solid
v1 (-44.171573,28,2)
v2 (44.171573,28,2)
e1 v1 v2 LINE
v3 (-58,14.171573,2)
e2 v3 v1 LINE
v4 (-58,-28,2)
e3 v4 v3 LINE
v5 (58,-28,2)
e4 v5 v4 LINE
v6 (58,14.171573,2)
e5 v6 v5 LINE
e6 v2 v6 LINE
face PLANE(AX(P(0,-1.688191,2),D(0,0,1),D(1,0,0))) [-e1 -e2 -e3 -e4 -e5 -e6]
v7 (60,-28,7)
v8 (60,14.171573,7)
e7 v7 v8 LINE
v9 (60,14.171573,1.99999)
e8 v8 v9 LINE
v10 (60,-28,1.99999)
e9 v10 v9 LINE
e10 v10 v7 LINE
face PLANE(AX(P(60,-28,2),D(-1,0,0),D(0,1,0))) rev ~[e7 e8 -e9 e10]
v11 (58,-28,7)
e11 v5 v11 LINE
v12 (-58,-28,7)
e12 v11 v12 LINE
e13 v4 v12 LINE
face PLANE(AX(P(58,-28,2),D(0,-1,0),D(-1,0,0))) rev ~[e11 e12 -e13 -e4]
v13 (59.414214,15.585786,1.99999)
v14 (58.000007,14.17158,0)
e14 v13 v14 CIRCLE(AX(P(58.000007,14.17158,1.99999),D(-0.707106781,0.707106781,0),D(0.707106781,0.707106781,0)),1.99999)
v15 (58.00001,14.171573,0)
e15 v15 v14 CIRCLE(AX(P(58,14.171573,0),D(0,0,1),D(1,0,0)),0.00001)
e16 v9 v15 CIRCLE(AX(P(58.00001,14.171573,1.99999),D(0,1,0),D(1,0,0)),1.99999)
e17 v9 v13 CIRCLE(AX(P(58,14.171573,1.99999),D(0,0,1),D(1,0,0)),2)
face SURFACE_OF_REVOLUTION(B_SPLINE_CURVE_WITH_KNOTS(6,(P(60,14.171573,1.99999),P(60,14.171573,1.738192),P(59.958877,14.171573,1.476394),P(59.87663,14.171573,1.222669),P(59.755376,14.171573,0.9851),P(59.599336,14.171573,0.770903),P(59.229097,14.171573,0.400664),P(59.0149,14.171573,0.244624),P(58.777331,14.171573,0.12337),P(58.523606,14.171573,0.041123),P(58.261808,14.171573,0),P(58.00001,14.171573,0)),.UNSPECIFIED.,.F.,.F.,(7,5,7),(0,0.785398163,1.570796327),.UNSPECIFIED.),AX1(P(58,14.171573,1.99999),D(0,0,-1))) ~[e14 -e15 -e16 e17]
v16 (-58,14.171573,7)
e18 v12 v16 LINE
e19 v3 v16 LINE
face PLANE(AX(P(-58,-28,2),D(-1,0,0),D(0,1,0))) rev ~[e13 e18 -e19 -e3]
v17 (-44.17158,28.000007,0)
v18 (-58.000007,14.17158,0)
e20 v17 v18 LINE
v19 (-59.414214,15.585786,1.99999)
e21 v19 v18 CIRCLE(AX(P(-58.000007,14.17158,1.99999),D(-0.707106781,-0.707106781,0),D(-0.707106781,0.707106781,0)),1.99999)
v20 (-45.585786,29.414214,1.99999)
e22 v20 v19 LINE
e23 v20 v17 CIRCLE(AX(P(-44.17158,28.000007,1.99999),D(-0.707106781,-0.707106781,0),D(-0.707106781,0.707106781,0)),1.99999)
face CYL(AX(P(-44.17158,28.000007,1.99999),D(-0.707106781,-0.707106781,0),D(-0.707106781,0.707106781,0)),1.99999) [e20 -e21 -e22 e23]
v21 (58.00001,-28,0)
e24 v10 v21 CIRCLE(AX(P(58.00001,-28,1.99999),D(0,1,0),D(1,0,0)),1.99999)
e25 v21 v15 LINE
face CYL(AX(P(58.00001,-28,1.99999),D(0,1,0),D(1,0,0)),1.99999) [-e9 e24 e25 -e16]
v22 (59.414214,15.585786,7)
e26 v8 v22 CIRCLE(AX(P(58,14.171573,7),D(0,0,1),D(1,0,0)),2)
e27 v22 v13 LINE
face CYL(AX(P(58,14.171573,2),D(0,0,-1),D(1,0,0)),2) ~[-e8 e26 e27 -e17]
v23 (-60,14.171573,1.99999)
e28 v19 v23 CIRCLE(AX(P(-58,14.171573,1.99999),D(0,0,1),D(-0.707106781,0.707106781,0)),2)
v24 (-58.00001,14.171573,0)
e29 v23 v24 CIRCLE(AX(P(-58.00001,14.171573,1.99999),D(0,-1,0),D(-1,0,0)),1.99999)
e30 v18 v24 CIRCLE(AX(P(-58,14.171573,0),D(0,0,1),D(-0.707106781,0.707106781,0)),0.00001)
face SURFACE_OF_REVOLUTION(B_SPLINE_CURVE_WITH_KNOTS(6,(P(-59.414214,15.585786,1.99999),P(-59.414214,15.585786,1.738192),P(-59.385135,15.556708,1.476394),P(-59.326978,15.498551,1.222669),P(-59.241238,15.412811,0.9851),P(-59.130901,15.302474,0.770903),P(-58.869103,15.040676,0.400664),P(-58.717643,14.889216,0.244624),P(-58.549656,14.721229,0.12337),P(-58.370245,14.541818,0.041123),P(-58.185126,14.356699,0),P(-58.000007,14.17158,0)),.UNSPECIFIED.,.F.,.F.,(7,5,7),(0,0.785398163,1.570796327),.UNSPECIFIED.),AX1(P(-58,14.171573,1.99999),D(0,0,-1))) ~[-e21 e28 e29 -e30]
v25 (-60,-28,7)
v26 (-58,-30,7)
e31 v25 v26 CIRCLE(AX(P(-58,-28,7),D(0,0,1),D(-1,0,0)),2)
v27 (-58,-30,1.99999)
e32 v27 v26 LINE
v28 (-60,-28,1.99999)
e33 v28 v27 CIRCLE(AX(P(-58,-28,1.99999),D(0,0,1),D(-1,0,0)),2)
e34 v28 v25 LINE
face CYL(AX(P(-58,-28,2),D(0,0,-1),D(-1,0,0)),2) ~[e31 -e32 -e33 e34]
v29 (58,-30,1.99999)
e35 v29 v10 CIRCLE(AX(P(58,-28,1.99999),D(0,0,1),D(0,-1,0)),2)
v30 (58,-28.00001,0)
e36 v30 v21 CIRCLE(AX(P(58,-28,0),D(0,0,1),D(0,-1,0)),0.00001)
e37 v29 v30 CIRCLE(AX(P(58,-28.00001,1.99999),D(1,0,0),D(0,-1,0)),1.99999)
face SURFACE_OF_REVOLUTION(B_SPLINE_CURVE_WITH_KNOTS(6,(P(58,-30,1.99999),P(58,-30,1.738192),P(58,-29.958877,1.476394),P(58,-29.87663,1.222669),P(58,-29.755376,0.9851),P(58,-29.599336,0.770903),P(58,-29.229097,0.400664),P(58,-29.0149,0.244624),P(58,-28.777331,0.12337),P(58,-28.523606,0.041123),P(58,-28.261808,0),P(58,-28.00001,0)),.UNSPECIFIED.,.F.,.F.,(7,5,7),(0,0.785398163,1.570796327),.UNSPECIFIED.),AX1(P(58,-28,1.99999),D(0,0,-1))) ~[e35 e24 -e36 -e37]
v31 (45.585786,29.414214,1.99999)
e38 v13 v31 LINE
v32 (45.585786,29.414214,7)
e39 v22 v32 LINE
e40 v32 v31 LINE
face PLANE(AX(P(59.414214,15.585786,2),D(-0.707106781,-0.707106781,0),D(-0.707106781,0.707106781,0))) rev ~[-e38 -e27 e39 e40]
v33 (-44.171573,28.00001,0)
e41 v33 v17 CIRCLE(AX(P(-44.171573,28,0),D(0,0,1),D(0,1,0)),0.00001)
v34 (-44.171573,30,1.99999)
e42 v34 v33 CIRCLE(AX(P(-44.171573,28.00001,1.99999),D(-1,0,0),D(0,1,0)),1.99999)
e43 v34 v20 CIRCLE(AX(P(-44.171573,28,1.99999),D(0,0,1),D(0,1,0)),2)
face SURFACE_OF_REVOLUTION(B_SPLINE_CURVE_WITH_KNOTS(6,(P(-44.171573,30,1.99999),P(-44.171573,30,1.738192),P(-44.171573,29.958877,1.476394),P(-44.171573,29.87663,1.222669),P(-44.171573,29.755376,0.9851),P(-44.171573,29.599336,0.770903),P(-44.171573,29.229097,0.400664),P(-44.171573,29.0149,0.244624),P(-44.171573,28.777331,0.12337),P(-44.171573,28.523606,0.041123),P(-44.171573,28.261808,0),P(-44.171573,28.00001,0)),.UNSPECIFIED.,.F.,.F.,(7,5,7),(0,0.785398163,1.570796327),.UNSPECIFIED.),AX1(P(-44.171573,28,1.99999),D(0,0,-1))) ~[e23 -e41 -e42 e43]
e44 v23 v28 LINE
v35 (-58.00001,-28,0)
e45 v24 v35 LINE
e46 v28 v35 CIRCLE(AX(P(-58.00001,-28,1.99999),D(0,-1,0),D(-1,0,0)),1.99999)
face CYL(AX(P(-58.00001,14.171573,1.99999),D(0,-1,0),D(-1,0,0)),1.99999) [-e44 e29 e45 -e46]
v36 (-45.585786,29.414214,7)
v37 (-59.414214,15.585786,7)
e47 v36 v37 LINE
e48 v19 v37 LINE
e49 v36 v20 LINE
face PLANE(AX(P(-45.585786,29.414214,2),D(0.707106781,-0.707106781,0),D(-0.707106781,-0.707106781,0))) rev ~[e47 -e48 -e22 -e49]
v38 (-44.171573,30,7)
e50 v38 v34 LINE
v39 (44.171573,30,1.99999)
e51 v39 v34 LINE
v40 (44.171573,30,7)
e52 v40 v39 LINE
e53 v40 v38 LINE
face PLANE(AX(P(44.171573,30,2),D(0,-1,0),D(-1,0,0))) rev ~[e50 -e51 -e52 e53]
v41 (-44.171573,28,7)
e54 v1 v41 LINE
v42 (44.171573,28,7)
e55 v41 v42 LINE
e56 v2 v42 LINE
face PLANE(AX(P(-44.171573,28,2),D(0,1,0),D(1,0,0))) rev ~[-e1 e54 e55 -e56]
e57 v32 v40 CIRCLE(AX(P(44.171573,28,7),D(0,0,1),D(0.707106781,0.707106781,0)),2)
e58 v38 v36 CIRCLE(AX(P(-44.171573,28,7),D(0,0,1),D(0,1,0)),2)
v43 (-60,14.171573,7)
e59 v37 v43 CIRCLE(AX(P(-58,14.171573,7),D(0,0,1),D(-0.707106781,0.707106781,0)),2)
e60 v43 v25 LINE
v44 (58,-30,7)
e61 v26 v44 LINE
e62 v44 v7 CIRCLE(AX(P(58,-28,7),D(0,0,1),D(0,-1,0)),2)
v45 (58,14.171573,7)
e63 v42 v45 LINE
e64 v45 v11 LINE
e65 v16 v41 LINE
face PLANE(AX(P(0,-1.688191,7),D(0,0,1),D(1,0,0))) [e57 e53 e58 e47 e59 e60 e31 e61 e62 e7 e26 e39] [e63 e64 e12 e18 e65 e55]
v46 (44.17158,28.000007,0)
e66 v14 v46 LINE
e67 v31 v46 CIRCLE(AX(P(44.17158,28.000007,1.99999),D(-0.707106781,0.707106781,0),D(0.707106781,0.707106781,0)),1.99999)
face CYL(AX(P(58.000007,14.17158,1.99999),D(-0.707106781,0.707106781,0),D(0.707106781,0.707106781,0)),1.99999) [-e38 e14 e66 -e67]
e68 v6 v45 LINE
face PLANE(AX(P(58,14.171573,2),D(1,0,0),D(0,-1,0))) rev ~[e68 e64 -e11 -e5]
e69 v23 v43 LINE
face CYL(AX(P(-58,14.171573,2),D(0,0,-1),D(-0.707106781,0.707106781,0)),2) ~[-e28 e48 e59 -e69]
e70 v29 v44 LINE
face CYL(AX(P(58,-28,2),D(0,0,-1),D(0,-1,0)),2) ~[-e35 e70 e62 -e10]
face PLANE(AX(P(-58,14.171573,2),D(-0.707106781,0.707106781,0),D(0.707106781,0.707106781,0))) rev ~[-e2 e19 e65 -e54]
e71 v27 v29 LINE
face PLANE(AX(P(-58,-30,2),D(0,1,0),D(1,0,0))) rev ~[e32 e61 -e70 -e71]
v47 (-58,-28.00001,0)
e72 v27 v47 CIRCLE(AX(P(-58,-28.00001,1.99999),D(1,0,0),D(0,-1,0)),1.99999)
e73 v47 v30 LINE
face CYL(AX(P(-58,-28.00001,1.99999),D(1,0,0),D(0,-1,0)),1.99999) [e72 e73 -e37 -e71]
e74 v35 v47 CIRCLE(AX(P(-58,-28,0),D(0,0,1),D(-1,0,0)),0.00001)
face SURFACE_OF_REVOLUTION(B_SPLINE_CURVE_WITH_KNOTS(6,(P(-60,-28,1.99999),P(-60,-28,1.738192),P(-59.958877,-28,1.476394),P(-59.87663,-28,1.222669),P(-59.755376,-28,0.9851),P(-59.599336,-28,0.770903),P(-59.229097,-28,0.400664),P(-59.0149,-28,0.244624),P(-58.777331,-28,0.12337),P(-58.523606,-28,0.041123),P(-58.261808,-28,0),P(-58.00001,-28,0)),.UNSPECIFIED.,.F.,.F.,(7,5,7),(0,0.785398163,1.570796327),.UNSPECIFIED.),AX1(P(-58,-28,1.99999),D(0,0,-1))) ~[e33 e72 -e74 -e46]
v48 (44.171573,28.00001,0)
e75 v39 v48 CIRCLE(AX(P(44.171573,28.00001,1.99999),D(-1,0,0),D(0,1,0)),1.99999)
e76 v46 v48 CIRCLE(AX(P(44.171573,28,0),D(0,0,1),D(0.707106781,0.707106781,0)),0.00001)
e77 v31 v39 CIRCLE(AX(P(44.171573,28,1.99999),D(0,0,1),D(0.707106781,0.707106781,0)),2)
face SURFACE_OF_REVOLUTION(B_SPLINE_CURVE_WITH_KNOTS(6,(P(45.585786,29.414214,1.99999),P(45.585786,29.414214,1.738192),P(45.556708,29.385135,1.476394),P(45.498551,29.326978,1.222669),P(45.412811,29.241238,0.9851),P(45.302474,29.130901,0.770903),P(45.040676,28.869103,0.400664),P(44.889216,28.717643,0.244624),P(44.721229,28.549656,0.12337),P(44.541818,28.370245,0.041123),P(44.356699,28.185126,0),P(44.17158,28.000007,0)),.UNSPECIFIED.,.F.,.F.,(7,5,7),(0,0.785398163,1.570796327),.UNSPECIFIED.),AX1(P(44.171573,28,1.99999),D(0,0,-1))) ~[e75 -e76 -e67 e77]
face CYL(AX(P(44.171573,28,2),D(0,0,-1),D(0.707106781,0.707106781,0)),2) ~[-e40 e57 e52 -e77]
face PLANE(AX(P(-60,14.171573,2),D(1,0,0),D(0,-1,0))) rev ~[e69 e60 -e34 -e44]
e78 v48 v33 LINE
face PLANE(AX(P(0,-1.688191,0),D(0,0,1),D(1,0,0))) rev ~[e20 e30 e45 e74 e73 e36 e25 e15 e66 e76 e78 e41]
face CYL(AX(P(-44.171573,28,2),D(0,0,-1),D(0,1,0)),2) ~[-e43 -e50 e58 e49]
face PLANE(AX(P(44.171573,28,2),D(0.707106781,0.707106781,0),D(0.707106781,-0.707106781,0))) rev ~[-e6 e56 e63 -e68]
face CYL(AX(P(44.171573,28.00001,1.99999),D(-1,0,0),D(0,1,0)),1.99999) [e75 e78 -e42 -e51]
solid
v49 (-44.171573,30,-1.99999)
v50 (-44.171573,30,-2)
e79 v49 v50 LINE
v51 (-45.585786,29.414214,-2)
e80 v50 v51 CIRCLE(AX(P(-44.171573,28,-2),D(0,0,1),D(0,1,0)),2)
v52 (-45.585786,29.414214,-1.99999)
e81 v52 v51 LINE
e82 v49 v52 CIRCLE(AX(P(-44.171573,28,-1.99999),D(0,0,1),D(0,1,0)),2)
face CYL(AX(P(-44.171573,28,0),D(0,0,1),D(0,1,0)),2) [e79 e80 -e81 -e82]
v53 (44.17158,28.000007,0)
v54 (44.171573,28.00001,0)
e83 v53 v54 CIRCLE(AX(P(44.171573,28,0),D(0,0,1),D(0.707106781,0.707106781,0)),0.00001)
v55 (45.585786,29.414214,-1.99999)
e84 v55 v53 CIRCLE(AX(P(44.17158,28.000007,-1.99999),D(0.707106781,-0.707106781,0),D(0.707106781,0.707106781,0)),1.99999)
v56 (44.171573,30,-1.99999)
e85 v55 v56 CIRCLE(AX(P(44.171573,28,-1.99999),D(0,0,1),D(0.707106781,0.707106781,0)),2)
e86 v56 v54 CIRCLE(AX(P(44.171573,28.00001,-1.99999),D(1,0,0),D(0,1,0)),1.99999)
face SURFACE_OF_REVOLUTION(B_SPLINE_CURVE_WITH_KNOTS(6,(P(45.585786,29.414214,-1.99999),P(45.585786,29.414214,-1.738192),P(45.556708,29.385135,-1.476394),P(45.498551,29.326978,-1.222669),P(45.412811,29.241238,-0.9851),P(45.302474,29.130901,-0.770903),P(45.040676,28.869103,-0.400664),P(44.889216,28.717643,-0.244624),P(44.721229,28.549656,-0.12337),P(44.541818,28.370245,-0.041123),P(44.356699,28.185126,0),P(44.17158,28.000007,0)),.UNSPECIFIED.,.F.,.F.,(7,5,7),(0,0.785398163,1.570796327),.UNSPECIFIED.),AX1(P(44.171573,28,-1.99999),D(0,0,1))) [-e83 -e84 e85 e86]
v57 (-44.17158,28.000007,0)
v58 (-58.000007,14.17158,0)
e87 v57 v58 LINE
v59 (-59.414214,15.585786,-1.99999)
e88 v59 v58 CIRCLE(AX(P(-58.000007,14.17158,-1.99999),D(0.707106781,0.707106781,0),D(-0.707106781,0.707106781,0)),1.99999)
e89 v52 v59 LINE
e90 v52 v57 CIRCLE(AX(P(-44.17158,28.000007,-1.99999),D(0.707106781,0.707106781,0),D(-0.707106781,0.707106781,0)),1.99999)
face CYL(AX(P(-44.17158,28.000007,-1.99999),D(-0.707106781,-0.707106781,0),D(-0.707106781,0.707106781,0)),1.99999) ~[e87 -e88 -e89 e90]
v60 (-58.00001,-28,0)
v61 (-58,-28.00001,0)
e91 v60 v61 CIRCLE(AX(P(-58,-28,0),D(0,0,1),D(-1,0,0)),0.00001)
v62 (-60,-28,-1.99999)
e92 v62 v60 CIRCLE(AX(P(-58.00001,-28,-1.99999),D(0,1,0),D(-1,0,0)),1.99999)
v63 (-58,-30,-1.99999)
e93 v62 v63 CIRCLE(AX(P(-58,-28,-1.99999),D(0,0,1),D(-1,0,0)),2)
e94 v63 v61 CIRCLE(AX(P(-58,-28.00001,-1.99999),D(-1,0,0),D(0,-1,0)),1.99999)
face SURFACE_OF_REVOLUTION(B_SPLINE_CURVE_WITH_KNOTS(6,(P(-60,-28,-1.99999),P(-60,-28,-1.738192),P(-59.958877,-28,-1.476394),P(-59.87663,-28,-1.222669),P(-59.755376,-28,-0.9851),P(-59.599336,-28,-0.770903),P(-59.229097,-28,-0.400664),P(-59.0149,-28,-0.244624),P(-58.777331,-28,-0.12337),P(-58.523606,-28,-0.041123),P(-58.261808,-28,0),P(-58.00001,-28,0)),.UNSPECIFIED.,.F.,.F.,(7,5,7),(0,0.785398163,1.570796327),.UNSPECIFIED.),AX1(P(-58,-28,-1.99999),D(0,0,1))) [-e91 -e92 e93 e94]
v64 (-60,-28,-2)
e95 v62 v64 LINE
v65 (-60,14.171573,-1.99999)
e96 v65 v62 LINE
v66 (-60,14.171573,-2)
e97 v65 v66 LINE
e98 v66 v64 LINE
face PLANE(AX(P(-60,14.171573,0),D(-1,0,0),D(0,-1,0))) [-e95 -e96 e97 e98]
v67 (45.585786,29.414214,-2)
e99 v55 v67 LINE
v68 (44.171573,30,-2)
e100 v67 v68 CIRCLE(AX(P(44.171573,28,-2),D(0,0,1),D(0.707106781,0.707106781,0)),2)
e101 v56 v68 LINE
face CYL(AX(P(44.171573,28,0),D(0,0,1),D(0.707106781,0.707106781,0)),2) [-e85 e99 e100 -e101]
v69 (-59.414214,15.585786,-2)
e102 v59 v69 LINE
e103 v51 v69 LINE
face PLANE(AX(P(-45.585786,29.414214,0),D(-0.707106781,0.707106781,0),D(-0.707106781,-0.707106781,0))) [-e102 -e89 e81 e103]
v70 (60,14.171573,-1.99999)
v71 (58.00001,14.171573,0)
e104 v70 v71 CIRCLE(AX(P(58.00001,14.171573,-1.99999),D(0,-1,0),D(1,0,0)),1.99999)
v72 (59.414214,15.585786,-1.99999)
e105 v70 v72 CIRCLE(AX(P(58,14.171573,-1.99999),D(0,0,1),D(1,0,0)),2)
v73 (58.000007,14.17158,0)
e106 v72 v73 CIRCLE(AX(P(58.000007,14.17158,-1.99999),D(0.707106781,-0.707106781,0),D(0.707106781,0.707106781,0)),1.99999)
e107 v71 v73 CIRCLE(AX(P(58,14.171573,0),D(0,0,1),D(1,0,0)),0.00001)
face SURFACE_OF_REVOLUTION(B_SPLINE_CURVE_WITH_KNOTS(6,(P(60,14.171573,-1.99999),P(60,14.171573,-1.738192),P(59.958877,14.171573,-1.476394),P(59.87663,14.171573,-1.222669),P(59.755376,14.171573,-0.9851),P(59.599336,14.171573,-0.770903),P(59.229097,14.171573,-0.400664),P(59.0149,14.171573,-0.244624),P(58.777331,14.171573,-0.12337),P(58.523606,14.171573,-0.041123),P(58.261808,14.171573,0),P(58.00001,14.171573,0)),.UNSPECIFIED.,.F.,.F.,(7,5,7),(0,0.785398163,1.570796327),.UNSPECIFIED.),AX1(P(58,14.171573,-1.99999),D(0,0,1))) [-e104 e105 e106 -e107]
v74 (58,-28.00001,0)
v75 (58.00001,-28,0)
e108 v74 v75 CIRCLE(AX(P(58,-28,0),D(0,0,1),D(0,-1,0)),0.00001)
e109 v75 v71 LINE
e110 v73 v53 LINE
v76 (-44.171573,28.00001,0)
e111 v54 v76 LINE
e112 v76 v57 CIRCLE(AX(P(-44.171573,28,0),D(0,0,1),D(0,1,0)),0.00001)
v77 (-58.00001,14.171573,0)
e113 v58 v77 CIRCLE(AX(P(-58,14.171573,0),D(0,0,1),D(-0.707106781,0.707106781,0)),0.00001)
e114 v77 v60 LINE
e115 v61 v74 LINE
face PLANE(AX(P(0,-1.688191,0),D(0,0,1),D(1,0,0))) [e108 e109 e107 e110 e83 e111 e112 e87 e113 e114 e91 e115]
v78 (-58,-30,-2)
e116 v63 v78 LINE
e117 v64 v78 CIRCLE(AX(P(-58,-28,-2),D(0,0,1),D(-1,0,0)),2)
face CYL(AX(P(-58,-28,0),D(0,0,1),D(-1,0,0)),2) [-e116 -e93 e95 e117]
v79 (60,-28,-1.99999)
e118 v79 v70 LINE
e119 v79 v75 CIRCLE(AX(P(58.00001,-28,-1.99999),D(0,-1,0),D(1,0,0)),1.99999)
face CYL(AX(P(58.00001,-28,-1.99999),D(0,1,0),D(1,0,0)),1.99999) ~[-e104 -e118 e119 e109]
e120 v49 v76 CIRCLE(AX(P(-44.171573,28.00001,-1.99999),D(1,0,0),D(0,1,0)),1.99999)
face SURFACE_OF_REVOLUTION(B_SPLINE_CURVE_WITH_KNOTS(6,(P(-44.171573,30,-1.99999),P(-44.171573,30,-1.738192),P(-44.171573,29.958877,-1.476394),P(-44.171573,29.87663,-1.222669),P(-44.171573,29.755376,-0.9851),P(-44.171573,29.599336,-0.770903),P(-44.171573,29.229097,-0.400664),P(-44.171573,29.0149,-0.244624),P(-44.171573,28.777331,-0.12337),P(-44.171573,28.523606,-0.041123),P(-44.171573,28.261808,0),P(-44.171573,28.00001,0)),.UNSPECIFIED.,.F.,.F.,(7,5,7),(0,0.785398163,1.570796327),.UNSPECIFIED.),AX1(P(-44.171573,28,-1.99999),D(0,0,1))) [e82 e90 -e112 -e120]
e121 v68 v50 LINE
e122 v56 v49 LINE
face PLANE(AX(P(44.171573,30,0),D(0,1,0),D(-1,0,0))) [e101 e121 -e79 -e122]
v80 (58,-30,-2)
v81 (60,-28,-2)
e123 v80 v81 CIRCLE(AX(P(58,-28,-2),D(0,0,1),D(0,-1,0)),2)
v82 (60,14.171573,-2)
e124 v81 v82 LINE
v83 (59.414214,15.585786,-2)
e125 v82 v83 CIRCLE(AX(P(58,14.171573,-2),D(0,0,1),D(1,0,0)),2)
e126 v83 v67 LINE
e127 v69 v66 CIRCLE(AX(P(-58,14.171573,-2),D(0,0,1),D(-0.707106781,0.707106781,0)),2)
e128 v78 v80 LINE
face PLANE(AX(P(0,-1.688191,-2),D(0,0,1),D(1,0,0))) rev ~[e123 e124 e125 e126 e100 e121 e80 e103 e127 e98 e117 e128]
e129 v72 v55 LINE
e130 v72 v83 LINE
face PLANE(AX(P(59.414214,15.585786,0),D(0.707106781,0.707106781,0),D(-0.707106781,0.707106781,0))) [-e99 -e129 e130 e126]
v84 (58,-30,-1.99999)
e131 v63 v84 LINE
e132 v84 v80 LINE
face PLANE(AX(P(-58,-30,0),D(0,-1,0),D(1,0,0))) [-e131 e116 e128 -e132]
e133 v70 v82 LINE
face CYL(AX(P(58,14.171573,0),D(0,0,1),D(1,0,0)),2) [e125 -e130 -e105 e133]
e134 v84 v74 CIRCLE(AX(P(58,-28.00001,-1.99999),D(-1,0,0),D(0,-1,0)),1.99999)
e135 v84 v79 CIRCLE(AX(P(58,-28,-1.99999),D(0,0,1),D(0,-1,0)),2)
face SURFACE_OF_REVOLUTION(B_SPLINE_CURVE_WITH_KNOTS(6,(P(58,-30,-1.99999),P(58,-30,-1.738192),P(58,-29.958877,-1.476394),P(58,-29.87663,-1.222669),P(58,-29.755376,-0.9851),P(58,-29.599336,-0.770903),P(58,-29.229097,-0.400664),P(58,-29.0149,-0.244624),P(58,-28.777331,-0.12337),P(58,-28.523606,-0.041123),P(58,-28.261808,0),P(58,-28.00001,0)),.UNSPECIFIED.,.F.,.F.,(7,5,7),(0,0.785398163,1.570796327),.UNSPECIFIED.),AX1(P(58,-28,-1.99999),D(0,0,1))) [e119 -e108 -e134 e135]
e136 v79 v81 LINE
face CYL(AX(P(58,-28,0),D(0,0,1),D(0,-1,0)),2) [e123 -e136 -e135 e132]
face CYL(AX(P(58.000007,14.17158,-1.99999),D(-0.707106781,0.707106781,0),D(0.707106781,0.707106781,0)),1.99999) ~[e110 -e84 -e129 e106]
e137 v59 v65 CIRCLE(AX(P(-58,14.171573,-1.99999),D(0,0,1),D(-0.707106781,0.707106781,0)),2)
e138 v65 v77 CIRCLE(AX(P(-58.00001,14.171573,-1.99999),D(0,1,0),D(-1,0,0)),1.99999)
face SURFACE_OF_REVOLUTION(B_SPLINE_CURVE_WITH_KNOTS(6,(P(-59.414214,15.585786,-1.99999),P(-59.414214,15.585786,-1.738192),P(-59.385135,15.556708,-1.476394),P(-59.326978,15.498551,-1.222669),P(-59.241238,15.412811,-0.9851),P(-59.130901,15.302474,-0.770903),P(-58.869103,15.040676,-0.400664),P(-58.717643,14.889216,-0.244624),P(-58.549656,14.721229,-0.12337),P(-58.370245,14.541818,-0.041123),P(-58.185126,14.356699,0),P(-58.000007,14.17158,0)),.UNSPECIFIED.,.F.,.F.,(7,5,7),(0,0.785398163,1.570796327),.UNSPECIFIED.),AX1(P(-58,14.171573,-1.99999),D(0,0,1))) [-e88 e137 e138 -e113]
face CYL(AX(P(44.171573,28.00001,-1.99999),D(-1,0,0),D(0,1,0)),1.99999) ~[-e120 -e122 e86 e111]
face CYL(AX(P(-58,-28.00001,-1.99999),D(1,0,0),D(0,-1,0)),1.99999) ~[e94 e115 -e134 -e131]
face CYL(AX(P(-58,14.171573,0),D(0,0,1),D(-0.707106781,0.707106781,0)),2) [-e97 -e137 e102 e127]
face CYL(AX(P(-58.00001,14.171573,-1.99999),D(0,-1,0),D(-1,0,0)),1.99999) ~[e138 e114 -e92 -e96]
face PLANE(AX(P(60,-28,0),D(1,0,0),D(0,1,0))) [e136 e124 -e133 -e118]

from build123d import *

# Parameters (mm, degrees)
F1_DEPTH = 2
F2_R     = 1.99999
F4_DEPTH = 5
F5_DEPTH = 2
F6_R     = 1.99999


# Not quite as in the source:
# - a fillet or chamfer is up to 0.001 mm smaller than in the source, because OpenCascade refuses the exact size


with BuildPart() as f1:
    # F0 (on Top) → F1 (new body)
    with BuildSketch(Plane.XY):
        with BuildLine():
            ThreePointArc((-60, -28), (-59.4142135624, -29.4142135624), (-58, -30))
            Line((-58, -30), (58, -30))
            ThreePointArc((58, -30), (59.4142135624, -29.4142135624), (60, -28))
            Line((60, -28), (60, 14.1715728753))
            ThreePointArc((60, 14.1715728753), (59.847759065, 14.93693974), (59.4142135624, 15.5857864376))
            Line((59.4142135624, 15.5857864376), (45.5857864376, 29.4142135624))
            ThreePointArc((45.5857864376, 29.4142135624), (44.93693974, 29.847759065), (44.1715728753, 30))
            Line((44.1715728753, 30), (-44.1715728753, 30))
            ThreePointArc((-44.1715728753, 30), (-44.93693974, 29.847759065), (-45.5857864376, 29.4142135624))
            Line((-45.5857864376, 29.4142135624), (-59.4142135624, 15.5857864376))
            ThreePointArc((-59.4142135624, 15.5857864376), (-59.847759065, 14.93693974), (-60, 14.1715728753))
            Line((-60, 14.1715728753), (-60, -28))
        make_face()
    extrude(amount=F1_DEPTH)

    # F2 (radius 2 in the source; OpenCascade refuses exactly that, so slightly less here)
    f2_edges = [f1.edges().sort_by_distance(p)[0] for p in [
        (0, -30, 0),
        (-60, -6.914214, 0),
        (0, 30, 0),
        (52.5, 22.5, 0),
        (60, -6.914214, 0),
        (-52.5, 22.5, 0),
    ]]
    fillet(f2_edges, radius=F2_R)

    # F3 (on face) → F4 (join)
    with BuildSketch(Plane.XY.offset(2)):
        with BuildLine():
            Line((-45.5857864376, 29.4142135624), (-59.4142135624, 15.5857864376))
            ThreePointArc((-59.4142135624, 15.5857864376), (-59.847759065, 14.93693974), (-60, 14.1715728753))
            Line((-60, 14.1715728753), (-60, -28))
            ThreePointArc((-60, -28), (-59.4142135624, -29.4142135624), (-58, -30))
            Line((-58, -30), (58, -30))
            ThreePointArc((58, -30), (59.4142135624, -29.4142135624), (60, -28))
            Line((60, -28), (60, 14.1715728753))
            ThreePointArc((60, 14.1715728753), (59.847759065, 14.93693974), (59.4142135624, 15.5857864376))
            Line((59.4142135624, 15.5857864376), (45.5857864376, 29.4142135624))
            ThreePointArc((45.5857864376, 29.4142135624), (44.93693974, 29.847759065), (44.1715728753, 30))
            Line((44.1715728753, 30), (-44.1715728753, 30))
            ThreePointArc((-44.1715728753, 30), (-44.93693974, 29.847759065), (-45.5857864376, 29.4142135624))
        make_face()
        Polygon((-44.1715728753, 28), (44.1715728753, 28), (58, 14.1715728753), (58, -28), (-58, -28), (-58, 14.1715728753), align=None, mode=Mode.SUBTRACT)
    extrude(amount=F4_DEPTH)


with BuildPart() as f5:
    # F0 (on Top) → F5 (new body)
    with BuildSketch(Plane.XY):
        with BuildLine():
            ThreePointArc((-60, -28), (-59.4142135624, -29.4142135624), (-58, -30))
            Line((-58, -30), (58, -30))
            ThreePointArc((58, -30), (59.4142135624, -29.4142135624), (60, -28))
            Line((60, -28), (60, 14.1715728753))
            ThreePointArc((60, 14.1715728753), (59.847759065, 14.93693974), (59.4142135624, 15.5857864376))
            Line((59.4142135624, 15.5857864376), (45.5857864376, 29.4142135624))
            ThreePointArc((45.5857864376, 29.4142135624), (44.93693974, 29.847759065), (44.1715728753, 30))
            Line((44.1715728753, 30), (-44.1715728753, 30))
            ThreePointArc((-44.1715728753, 30), (-44.93693974, 29.847759065), (-45.5857864376, 29.4142135624))
            Line((-45.5857864376, 29.4142135624), (-59.4142135624, 15.5857864376))
            ThreePointArc((-59.4142135624, 15.5857864376), (-59.847759065, 14.93693974), (-60, 14.1715728753))
            Line((-60, 14.1715728753), (-60, -28))
        make_face()
    extrude(amount=-F5_DEPTH)

    # F6 (radius 2 in the source; OpenCascade refuses exactly that, so slightly less here)
    f6_edges = [f5.edges().sort_by_distance(p)[0] for p in [
        (-60, -6.914214, 0),
    ]]
    fillet(f6_edges, radius=F6_R)


solid = Compound([f1.part, f5.part])
